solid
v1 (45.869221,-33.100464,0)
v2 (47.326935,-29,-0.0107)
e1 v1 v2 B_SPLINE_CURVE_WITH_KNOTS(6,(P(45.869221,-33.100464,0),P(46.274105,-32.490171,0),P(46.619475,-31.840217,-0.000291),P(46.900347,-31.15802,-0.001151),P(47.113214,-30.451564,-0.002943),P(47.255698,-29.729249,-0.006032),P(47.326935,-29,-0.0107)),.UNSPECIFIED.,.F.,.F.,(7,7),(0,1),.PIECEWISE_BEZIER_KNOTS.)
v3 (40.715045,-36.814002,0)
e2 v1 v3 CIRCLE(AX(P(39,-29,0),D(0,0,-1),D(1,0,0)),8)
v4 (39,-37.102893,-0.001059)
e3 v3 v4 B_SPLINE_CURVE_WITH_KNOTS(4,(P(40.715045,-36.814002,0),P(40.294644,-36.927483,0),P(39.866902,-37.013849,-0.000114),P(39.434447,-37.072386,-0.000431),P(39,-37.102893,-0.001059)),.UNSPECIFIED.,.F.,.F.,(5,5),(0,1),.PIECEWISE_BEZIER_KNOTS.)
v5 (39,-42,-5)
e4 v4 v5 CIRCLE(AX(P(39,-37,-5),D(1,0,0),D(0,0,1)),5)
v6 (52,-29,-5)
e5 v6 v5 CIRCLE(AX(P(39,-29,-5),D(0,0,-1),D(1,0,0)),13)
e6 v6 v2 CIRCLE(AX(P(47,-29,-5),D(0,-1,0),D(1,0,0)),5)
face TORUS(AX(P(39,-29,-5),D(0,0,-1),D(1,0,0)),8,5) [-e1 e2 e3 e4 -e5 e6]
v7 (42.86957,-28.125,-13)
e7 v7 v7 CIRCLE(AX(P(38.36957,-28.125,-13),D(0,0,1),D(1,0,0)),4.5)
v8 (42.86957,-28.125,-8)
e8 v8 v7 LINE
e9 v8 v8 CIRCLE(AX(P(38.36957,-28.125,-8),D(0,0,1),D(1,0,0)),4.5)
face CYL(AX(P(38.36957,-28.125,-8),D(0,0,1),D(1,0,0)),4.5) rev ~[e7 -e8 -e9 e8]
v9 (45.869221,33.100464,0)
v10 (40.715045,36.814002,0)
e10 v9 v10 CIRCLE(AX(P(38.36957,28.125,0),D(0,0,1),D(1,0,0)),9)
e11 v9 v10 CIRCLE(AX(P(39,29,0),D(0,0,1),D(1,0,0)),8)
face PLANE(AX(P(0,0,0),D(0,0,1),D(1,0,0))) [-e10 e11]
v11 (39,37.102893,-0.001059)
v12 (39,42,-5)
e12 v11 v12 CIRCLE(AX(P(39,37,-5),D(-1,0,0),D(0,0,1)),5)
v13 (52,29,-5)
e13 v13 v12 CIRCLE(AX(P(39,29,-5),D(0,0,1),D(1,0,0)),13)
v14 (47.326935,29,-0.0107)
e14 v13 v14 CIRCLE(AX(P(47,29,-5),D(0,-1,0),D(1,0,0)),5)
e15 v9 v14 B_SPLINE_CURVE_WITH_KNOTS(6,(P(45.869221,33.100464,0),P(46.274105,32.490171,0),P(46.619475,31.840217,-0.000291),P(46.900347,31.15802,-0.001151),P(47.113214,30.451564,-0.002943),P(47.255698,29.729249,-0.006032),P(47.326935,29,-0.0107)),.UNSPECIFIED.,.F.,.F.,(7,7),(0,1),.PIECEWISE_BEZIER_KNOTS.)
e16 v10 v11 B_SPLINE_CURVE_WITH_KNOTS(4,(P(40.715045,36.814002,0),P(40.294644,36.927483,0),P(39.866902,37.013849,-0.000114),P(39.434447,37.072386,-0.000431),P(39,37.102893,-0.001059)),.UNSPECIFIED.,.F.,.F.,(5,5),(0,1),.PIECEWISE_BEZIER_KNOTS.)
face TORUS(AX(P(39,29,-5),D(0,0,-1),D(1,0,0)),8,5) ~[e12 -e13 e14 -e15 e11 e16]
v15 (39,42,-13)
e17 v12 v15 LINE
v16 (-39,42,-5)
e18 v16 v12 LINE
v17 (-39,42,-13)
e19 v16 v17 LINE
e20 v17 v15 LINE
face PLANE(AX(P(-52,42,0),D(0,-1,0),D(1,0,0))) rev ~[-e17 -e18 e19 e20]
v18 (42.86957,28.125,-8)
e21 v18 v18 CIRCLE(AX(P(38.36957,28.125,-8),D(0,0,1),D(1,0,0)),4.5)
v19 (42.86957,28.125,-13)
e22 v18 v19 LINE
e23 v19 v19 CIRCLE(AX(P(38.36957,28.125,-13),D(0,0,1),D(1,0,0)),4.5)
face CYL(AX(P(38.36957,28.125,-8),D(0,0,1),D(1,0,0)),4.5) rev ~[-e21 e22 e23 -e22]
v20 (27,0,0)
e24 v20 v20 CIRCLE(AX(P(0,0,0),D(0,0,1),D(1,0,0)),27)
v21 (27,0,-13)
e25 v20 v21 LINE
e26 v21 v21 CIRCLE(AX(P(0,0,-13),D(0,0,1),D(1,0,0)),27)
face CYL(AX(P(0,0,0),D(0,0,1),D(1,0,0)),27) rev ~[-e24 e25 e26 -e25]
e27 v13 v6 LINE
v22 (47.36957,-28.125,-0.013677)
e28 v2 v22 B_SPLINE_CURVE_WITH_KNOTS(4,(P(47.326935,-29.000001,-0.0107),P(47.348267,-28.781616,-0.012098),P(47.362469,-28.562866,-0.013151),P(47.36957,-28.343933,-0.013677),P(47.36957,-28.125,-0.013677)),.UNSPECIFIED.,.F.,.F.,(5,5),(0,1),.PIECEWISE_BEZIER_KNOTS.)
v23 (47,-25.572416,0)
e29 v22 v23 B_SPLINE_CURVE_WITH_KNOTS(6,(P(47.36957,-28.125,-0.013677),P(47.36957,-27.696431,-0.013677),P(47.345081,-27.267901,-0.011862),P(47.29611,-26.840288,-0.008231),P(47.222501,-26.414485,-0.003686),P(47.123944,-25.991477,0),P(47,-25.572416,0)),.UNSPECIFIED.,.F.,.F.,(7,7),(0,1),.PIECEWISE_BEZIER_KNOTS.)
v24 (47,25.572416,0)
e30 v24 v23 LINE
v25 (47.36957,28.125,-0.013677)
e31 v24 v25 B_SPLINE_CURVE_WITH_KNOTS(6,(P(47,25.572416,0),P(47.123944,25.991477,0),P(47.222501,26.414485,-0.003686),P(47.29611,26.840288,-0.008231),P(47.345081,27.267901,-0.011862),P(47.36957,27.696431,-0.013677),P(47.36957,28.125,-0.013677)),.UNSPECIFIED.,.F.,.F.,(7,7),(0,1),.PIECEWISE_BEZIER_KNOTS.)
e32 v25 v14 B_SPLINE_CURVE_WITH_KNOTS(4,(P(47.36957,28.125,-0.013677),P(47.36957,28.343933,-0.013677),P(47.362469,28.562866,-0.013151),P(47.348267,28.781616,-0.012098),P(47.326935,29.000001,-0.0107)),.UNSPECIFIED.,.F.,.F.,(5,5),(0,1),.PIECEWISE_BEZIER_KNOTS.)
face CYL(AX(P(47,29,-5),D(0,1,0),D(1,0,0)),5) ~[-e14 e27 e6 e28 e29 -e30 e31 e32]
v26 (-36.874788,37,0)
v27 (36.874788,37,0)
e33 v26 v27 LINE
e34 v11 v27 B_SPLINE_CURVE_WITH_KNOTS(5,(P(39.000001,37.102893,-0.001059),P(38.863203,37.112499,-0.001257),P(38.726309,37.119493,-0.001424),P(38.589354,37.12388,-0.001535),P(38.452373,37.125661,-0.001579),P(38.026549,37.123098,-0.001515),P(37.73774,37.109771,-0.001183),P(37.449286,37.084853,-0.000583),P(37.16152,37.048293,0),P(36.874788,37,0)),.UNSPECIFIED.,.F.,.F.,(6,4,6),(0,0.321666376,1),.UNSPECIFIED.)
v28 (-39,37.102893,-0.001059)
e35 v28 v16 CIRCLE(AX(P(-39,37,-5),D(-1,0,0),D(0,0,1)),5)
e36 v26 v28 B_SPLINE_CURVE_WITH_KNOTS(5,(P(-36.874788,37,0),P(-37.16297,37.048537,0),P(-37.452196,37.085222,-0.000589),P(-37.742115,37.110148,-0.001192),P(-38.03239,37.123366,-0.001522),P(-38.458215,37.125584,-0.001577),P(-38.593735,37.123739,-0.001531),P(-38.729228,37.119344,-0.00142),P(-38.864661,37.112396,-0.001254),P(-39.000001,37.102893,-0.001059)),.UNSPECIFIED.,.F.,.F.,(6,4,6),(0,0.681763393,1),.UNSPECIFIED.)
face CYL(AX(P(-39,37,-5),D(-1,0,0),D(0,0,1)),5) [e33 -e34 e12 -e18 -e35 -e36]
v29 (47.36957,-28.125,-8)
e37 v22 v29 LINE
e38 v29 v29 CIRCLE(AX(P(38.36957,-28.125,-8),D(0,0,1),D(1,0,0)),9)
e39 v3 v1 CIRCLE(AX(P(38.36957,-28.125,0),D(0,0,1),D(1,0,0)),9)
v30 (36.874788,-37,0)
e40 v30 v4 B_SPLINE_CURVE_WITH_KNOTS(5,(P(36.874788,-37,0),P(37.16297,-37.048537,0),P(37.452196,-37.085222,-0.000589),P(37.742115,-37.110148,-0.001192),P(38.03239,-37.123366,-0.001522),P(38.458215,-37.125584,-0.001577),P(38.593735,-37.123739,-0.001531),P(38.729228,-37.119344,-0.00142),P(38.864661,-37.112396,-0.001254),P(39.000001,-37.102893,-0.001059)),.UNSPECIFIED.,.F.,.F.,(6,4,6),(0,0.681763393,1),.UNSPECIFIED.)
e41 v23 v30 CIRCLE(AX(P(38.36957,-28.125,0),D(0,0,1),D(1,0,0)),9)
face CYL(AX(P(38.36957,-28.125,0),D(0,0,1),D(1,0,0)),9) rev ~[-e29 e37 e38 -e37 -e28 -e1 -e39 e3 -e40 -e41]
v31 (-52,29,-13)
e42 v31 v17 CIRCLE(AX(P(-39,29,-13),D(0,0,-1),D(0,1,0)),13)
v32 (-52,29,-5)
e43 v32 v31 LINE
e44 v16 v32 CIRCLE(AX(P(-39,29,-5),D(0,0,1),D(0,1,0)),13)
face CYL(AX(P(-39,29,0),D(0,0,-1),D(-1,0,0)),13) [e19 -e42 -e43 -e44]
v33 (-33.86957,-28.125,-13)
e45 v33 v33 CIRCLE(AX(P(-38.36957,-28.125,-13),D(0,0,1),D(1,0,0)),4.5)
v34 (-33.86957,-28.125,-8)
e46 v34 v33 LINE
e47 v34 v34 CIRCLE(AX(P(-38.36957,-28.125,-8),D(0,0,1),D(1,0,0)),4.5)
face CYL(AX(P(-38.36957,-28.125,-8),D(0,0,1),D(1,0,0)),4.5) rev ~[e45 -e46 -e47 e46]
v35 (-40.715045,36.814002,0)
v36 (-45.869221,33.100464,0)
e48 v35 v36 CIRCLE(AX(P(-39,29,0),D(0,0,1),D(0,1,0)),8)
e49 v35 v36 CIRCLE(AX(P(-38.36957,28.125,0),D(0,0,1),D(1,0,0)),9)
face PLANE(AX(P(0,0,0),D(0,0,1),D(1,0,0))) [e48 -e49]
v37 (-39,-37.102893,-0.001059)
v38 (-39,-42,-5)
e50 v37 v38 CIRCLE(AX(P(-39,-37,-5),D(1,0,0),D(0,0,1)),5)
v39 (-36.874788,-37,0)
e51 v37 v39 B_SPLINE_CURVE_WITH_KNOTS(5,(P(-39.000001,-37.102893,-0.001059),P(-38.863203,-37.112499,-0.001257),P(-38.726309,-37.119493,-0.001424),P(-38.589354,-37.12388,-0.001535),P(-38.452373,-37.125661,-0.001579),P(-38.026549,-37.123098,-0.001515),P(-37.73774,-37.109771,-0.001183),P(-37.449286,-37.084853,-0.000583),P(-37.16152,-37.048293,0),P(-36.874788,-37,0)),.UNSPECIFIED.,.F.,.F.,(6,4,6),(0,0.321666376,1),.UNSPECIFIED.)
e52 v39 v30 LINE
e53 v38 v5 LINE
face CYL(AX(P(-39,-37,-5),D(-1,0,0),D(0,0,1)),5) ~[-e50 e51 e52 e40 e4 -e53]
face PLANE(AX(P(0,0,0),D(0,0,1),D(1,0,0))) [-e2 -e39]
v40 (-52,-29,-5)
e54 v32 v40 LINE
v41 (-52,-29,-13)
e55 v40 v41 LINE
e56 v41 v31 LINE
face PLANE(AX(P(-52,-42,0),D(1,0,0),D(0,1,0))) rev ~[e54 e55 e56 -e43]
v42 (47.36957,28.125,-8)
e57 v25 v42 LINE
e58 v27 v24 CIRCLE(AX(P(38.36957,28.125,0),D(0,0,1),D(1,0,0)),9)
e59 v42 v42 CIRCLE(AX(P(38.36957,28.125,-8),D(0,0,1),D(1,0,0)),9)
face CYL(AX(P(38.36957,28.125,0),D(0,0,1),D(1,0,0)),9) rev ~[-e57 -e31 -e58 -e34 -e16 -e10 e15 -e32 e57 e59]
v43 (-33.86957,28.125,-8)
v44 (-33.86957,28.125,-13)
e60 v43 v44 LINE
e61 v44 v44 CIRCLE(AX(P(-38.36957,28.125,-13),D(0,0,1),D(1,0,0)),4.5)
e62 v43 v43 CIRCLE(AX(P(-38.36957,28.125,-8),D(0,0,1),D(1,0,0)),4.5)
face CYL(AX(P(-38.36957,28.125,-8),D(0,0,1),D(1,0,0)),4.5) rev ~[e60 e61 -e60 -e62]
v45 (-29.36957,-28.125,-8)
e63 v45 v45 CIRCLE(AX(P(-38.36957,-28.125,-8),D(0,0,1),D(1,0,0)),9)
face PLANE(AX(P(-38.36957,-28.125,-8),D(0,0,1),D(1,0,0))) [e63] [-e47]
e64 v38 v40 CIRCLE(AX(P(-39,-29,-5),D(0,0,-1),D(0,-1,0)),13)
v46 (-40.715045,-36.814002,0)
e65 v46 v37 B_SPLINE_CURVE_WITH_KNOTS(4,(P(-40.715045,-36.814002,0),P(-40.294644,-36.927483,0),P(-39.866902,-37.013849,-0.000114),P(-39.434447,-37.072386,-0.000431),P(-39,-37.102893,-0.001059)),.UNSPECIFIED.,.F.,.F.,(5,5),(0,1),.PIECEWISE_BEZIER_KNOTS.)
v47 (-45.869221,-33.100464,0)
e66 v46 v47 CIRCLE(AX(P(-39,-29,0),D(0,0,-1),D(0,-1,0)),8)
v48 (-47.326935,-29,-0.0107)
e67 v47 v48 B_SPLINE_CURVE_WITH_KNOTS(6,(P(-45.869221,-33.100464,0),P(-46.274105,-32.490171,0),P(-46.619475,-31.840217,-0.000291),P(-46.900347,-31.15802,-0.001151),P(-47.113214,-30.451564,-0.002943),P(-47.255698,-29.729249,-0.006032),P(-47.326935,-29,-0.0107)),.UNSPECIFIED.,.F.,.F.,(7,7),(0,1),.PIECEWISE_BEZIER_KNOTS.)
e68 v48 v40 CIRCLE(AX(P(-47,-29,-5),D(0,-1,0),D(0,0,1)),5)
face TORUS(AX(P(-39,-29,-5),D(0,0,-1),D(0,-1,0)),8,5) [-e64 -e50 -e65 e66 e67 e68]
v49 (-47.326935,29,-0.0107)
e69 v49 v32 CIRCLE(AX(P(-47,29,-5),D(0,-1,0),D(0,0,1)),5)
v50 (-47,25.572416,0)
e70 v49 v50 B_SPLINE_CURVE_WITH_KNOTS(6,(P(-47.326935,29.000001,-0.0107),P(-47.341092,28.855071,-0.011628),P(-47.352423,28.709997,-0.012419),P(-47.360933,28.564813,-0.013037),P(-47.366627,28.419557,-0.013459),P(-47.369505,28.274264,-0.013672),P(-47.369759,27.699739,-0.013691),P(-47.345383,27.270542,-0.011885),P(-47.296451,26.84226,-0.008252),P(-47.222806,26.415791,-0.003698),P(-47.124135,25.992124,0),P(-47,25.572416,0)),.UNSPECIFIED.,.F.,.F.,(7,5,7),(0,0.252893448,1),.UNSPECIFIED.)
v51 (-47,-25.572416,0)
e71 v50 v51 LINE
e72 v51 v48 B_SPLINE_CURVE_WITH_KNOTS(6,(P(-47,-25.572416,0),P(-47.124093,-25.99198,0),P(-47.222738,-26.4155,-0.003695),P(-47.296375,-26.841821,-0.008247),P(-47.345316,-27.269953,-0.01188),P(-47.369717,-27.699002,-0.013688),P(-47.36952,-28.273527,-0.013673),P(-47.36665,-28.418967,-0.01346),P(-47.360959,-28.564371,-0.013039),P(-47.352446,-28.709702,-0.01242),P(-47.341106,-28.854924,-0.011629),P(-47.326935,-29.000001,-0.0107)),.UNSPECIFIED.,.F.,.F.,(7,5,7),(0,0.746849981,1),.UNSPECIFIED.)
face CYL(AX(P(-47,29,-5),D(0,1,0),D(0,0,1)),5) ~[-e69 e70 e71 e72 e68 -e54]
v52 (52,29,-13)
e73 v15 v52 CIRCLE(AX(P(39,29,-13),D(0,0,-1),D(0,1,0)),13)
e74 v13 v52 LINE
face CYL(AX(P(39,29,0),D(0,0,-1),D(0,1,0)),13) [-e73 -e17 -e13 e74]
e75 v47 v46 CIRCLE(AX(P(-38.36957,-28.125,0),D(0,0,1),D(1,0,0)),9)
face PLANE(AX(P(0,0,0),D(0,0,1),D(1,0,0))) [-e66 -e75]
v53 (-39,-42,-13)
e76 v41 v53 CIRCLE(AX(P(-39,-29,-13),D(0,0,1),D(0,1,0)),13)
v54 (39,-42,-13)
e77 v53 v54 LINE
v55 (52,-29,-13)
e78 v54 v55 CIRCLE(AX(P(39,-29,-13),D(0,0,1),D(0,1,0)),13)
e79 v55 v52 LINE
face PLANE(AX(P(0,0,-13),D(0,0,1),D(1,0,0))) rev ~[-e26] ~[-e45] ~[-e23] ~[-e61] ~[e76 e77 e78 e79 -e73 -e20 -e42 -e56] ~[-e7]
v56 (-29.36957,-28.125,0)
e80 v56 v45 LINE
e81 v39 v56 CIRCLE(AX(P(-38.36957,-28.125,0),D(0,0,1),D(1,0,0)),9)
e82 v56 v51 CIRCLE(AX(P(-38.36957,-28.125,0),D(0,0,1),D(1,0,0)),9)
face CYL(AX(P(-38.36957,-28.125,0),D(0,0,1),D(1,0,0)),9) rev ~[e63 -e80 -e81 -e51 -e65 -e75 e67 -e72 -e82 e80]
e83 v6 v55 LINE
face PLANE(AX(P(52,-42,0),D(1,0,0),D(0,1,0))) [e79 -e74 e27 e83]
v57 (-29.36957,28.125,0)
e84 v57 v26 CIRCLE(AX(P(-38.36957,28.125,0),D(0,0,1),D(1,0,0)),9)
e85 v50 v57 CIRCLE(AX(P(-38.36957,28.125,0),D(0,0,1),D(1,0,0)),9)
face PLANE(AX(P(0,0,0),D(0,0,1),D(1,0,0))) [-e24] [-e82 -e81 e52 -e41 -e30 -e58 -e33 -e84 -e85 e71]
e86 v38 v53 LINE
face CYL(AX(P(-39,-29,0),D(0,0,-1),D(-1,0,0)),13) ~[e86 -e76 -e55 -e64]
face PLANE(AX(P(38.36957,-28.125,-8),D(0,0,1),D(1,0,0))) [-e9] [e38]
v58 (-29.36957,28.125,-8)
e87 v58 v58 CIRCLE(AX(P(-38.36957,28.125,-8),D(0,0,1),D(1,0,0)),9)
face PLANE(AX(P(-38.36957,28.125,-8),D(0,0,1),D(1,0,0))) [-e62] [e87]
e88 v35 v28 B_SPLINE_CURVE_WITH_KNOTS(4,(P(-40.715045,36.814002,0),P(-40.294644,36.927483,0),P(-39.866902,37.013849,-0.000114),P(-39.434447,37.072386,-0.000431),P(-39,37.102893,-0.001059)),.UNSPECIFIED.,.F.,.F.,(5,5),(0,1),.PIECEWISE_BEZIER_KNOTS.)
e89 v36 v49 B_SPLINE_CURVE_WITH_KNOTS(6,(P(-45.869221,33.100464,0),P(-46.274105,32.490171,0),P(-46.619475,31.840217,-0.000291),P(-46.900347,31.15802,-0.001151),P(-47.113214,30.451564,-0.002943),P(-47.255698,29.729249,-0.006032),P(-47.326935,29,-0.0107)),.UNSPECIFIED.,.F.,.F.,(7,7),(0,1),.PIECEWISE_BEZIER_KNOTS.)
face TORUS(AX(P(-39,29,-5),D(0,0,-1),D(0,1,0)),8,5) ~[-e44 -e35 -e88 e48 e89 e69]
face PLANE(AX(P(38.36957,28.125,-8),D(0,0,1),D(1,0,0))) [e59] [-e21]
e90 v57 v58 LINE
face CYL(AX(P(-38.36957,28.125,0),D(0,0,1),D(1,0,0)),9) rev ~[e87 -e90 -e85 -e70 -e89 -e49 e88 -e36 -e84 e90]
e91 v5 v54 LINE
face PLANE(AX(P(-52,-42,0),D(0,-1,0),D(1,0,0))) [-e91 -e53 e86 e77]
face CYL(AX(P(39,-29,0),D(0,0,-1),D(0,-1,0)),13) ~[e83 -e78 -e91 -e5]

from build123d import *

# Parameters (mm, degrees)
F0_W          = 104
F0_H          = 84
F1_DEPTH      = 13
F3_R          = 9
F4_DEPTH      = 8
F5_R          = 4.5
F6_DEPTH      = 25
F7_R          = 27
F8_DEPTH      = 25
F9_R          = 13
F10_T1_DEPTH  = 58
F10_T3_DEPTH  = 78
F10_T6_ANGLE  = 90
F10_T8_ANGLE  = 90
F10_T10_ANGLE = 90
F10_T12_ANGLE = 90


# Not quite as in the source:
# - a fillet or chamfer that OpenCascade refuses, or shapes differently, is made with other operations: its cross-section is extruded or revolved along the edge and cut away or added


with BuildPart() as f1:
    # F0 (on Top) → F1 (new body)
    with BuildSketch(Plane.XY):
        Rectangle(F0_W, F0_H)
    extrude(amount=-F1_DEPTH)

    # F3 (on Top) → F4 (cut)
    with BuildSketch(Plane.XY):
        with Locations((38.3695703445, 28.125)):
            Circle(F3_R)
        with Locations((38.3695703445, -28.125)):
            Circle(F3_R)
        with Locations((-38.3695703445, 28.125)):
            Circle(F3_R)
        with Locations((-38.3695703445, -28.125)):
            Circle(F3_R)
    extrude(amount=-F4_DEPTH, mode=Mode.SUBTRACT)

    # F5 (on face) → F6 (cut)
    with BuildSketch(Plane.XY.offset(-8)):
        with Locations((38.3695703445, 28.125)):
            Circle(F5_R)
        with Locations((38.3695703445, -28.125)):
            Circle(F5_R)
        with Locations((-38.3695703445, 28.125)):
            Circle(F5_R)
        with Locations((-38.3695703445, -28.125)):
            Circle(F5_R)
    extrude(amount=-F6_DEPTH, mode=Mode.SUBTRACT)

    # F7 (on Top) → F8 (cut)
    with BuildSketch(Plane.XY):
        Circle(F7_R)
    extrude(amount=-F8_DEPTH, mode=Mode.SUBTRACT)

    # F9
    f9_edges = [f1.edges().sort_by_distance(p)[0] for p in [
        (-52, 42, -6.5),
        (-52, -42, -6.5),
        (52, -42, -6.5),
        (52, 42, -6.5),
    ]]
    fillet(f9_edges, radius=F9_R)

    # F10: fillet of radius 5 on 8 edges, made by hand

    # F10_s2 → F10_t1 (cut)
    with BuildSketch(Plane.XZ.offset(-29)):
        with BuildLine():
            ThreePointArc((-47, 0), (-50.5355339059, -1.4644660941), (-52, -5))
            Line((-52, -5), (-52, 0))
            Line((-52, 0), (-47, 0))
        make_face()
        with BuildLine():
            ThreePointArc((52, -5), (50.5355339059, -1.4644660941), (47, 0))
            Line((47, 0), (52, 0))
            Line((52, 0), (52, -5))
        make_face()
    extrude(amount=F10_T1_DEPTH, mode=Mode.SUBTRACT)

    # F10_s4 → F10_t3 (cut)
    with BuildSketch(Plane.YZ.offset(-39)):
        with BuildLine():
            ThreePointArc((-37, 0), (-40.5355339059, -1.4644660941), (-42, -5))
            Line((-42, -5), (-42, 0))
            Line((-42, 0), (-37, 0))
        make_face()
        with BuildLine():
            ThreePointArc((37, 0), (40.5355339059, -1.4644660941), (42, -5))
            Line((42, -5), (42, 0))
            Line((42, 0), (37, 0))
        make_face()
    extrude(amount=F10_T3_DEPTH, mode=Mode.SUBTRACT)

    # F10_s5 → F10_t6 (revolve, cut)
    with BuildSketch(Plane.XZ.offset(29)):
        with BuildLine():
            ThreePointArc((47, 0), (50.5355339059, -1.4644660941), (52, -5))
            Line((52, -5), (52, 0))
            Line((52, 0), (47, 0))
        make_face()
    revolve(axis=Axis((39, -29, 0), (0, 0, -1)), revolution_arc=F10_T6_ANGLE, mode=Mode.SUBTRACT)

    # F10_s7 → F10_t8 (revolve, cut)
    with BuildSketch(Plane.XZ.offset(-29)):
        with BuildLine():
            ThreePointArc((47, 0), (50.5355339059, -1.4644660941), (52, -5))
            Line((52, -5), (52, 0))
            Line((52, 0), (47, 0))
        make_face()
    revolve(axis=Axis((39, 29, 0), (0, 0, 1)), revolution_arc=F10_T8_ANGLE, mode=Mode.SUBTRACT)

    # F10_s9 → F10_t10 (revolve, cut)
    with BuildSketch(Plane.YZ.offset(-39)):
        with BuildLine():
            ThreePointArc((-37, 0), (-40.5355339059, -1.4644660941), (-42, -5))
            Line((-42, -5), (-42, 0))
            Line((-42, 0), (-37, 0))
        make_face()
    revolve(axis=Axis((-39, -29, 0), (0, 0, -1)), revolution_arc=F10_T10_ANGLE, mode=Mode.SUBTRACT)

    # F10_s11 → F10_t12 (revolve, cut)
    with BuildSketch(Plane.YZ.offset(-39)):
        with BuildLine():
            ThreePointArc((37, 0), (40.5355339059, -1.4644660941), (42, -5))
            Line((42, -5), (42, 0))
            Line((42, 0), (37, 0))
        make_face()
    revolve(axis=Axis((-39, 29, 0), (0, 0, 1)), revolution_arc=F10_T12_ANGLE, mode=Mode.SUBTRACT)


solid = f1.part
